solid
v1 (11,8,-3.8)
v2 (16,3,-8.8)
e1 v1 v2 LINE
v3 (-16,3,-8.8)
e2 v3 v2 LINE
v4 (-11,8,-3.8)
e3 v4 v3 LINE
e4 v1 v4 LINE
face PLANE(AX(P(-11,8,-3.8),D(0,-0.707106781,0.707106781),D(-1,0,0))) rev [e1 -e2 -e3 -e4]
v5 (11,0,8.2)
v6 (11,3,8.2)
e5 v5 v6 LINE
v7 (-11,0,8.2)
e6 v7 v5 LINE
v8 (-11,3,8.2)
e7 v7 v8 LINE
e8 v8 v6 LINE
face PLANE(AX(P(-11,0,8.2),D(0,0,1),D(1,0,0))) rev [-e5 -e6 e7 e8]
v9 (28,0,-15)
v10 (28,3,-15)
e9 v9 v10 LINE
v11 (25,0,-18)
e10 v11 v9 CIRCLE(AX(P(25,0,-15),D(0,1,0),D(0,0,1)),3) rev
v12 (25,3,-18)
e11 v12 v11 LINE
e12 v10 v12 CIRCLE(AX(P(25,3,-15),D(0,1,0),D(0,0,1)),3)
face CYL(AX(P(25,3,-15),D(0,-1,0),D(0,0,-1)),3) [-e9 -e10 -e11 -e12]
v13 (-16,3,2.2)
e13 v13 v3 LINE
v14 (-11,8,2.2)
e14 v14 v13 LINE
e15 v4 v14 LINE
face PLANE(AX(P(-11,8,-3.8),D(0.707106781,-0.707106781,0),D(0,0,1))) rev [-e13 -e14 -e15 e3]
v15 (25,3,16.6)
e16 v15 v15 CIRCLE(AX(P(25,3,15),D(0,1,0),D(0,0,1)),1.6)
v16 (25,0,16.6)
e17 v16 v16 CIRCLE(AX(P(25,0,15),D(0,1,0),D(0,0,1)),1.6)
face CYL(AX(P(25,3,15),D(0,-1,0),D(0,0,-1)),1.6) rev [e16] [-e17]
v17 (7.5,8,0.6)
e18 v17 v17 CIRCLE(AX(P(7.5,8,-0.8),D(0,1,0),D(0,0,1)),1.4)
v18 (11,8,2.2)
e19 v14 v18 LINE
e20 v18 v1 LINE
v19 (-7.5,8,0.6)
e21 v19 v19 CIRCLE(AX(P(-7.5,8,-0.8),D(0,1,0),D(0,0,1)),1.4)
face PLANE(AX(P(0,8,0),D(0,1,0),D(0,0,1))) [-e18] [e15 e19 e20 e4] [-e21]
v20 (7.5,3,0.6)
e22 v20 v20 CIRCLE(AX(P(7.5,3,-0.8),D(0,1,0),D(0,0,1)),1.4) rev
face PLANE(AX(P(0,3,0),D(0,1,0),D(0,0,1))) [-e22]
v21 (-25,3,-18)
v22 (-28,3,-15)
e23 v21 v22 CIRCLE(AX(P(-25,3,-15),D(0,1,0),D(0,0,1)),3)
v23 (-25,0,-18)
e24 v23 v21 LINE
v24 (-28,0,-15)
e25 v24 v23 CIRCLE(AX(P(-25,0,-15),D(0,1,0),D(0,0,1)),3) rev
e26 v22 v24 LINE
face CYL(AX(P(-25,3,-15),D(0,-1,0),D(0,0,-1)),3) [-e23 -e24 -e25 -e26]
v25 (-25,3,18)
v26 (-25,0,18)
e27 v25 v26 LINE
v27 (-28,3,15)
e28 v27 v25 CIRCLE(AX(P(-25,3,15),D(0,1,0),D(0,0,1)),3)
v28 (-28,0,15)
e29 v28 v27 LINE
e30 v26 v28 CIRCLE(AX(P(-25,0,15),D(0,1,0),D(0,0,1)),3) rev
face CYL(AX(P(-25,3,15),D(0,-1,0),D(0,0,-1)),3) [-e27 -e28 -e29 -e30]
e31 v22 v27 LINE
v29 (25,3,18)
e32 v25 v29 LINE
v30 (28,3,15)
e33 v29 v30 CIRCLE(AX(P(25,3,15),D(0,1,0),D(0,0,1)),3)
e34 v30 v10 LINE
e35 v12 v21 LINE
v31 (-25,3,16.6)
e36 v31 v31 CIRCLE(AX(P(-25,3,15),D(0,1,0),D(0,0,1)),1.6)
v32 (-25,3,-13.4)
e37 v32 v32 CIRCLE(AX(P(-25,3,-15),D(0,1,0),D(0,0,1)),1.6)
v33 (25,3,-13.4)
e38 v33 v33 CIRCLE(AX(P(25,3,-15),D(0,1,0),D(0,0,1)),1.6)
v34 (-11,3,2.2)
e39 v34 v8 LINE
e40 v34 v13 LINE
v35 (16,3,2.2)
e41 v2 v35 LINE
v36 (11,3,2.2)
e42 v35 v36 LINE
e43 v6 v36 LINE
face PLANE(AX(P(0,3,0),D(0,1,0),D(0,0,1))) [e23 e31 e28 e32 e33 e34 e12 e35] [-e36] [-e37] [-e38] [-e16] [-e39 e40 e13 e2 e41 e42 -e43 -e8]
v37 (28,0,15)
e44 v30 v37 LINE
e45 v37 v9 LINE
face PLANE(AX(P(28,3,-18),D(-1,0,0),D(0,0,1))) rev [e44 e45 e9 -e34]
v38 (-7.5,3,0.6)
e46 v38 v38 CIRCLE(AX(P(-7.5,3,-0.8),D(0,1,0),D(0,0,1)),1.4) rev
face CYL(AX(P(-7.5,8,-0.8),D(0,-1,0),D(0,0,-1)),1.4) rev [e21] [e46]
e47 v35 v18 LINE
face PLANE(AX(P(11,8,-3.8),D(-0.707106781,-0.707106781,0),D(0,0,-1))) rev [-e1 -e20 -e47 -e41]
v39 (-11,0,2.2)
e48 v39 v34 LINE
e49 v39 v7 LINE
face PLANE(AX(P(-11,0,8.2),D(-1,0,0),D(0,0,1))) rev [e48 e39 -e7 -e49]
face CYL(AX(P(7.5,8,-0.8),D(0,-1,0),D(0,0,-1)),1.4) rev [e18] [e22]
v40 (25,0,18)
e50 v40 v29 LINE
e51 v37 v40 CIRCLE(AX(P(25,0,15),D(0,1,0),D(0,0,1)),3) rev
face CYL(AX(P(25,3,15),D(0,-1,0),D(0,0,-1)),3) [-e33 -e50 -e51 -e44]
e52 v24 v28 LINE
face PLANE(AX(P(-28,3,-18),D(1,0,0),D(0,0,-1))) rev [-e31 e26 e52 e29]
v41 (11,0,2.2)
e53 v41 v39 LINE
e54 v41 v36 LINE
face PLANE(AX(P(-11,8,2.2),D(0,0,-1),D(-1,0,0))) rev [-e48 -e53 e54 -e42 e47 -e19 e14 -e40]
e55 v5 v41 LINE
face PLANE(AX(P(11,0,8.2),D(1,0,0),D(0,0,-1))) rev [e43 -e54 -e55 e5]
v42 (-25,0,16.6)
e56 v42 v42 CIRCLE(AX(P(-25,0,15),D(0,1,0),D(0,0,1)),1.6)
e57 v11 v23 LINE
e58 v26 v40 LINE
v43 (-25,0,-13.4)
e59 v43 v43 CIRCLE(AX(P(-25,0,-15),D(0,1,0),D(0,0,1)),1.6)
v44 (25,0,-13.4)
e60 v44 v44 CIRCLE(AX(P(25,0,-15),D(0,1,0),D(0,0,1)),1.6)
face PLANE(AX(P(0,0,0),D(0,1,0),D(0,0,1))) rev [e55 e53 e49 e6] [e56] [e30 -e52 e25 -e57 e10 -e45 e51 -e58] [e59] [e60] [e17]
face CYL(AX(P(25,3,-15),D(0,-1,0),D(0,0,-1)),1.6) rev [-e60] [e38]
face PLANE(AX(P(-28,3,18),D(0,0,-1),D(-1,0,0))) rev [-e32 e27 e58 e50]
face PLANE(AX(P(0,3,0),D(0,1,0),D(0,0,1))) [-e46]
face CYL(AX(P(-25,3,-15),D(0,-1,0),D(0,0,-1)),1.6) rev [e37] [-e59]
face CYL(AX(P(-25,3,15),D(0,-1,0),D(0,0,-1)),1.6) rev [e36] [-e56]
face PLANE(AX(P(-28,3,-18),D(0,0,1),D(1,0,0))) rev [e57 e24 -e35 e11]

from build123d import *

# Parameters (mm, degrees)
SKETCH_1_W          = 56
SKETCH_1_H          = 36
SKETCH_1_R          = 1.6
EXTRUDE_1_DEPTH     = 3
FILLET_1_R          = 3
SKETCH_2_W          = 22
SKETCH_2_H          = 6
SKETCH_2_R          = 1.4
EXTRUDE_2_DEPTH     = 5
SKETCH_3_W          = 22
SKETCH_3_H          = 6
CUT_EXTRUDE_1_DEPTH = 34.660065359
CHAMFER_1_SIZE      = 5


with BuildPart() as part:
    # ｽｹｯﾁ1 → ﾎﾞｽ - 押し出し1 (new body)
    with BuildSketch(Plane(origin=(0, 0, 0), x_dir=(1, 0, 0), z_dir=(0, 1, 0))):
        Rectangle(SKETCH_1_W, SKETCH_1_H)
        with Locations(Location((-25, 15, 0), (0, 0, 270))):
            Circle(SKETCH_1_R, mode=Mode.SUBTRACT)
        with Locations(Location((25, 15, 0), (0, 0, 270))):
            Circle(SKETCH_1_R, mode=Mode.SUBTRACT)
        with Locations(Location((25, -15, 0), (0, 0, 270))):
            Circle(SKETCH_1_R, mode=Mode.SUBTRACT)
        with Locations(Location((-25, -15, 0), (0, 0, 270))):
            Circle(SKETCH_1_R, mode=Mode.SUBTRACT)
    extrude(amount=EXTRUDE_1_DEPTH)

    # ﾌｨﾚｯﾄ1
    fillet_1_edges = [part.edges().sort_by_distance(p)[0] for p in [
        (28, 1.5, 18),
        (-28, 1.5, 18),
        (-28, 1.5, -18),
        (28, 1.5, -18),
    ]]
    fillet(fillet_1_edges, radius=FILLET_1_R)

    # ｽｹｯﾁ2 → ﾎﾞｽ - 押し出し2 (add)
    with BuildSketch(Plane(origin=(0, 3, 0), x_dir=(1, 0, 0), z_dir=(0, 1, 0))):
        with Locations((0, 0.8)):
            Rectangle(SKETCH_2_W, SKETCH_2_H)
        with Locations(Location((-7.5, 0.8, 0), (0, 0, 270))):
            Circle(SKETCH_2_R, mode=Mode.SUBTRACT)
        with Locations(Location((7.5, 0.8, 0), (0, 0, 270))):
            Circle(SKETCH_2_R, mode=Mode.SUBTRACT)
    extrude(amount=EXTRUDE_2_DEPTH)

    # ｽｹｯﾁ3 → ｶｯﾄ - 押し出し1 (cut, through all)
    with BuildSketch(Plane(origin=(0, 3, 0), x_dir=(1, 0, 0), z_dir=(0, 1, 0))):
        with Locations((0, -5.2)):
            Rectangle(SKETCH_3_W, SKETCH_3_H)
    extrude(amount=-CUT_EXTRUDE_1_DEPTH, mode=Mode.SUBTRACT)

    # 面取り1
    chamfer_1_edges = [part.edges().sort_by_distance(p)[0] for p in [
        (-11, 3, -0.8),
        (11, 3, -0.8),
        (0, 3, -3.8),
    ]]
    chamfer(chamfer_1_edges, length=CHAMFER_1_SIZE - 0.0001)  # a hair under: the kernel refuses the full size


solid = part.part
